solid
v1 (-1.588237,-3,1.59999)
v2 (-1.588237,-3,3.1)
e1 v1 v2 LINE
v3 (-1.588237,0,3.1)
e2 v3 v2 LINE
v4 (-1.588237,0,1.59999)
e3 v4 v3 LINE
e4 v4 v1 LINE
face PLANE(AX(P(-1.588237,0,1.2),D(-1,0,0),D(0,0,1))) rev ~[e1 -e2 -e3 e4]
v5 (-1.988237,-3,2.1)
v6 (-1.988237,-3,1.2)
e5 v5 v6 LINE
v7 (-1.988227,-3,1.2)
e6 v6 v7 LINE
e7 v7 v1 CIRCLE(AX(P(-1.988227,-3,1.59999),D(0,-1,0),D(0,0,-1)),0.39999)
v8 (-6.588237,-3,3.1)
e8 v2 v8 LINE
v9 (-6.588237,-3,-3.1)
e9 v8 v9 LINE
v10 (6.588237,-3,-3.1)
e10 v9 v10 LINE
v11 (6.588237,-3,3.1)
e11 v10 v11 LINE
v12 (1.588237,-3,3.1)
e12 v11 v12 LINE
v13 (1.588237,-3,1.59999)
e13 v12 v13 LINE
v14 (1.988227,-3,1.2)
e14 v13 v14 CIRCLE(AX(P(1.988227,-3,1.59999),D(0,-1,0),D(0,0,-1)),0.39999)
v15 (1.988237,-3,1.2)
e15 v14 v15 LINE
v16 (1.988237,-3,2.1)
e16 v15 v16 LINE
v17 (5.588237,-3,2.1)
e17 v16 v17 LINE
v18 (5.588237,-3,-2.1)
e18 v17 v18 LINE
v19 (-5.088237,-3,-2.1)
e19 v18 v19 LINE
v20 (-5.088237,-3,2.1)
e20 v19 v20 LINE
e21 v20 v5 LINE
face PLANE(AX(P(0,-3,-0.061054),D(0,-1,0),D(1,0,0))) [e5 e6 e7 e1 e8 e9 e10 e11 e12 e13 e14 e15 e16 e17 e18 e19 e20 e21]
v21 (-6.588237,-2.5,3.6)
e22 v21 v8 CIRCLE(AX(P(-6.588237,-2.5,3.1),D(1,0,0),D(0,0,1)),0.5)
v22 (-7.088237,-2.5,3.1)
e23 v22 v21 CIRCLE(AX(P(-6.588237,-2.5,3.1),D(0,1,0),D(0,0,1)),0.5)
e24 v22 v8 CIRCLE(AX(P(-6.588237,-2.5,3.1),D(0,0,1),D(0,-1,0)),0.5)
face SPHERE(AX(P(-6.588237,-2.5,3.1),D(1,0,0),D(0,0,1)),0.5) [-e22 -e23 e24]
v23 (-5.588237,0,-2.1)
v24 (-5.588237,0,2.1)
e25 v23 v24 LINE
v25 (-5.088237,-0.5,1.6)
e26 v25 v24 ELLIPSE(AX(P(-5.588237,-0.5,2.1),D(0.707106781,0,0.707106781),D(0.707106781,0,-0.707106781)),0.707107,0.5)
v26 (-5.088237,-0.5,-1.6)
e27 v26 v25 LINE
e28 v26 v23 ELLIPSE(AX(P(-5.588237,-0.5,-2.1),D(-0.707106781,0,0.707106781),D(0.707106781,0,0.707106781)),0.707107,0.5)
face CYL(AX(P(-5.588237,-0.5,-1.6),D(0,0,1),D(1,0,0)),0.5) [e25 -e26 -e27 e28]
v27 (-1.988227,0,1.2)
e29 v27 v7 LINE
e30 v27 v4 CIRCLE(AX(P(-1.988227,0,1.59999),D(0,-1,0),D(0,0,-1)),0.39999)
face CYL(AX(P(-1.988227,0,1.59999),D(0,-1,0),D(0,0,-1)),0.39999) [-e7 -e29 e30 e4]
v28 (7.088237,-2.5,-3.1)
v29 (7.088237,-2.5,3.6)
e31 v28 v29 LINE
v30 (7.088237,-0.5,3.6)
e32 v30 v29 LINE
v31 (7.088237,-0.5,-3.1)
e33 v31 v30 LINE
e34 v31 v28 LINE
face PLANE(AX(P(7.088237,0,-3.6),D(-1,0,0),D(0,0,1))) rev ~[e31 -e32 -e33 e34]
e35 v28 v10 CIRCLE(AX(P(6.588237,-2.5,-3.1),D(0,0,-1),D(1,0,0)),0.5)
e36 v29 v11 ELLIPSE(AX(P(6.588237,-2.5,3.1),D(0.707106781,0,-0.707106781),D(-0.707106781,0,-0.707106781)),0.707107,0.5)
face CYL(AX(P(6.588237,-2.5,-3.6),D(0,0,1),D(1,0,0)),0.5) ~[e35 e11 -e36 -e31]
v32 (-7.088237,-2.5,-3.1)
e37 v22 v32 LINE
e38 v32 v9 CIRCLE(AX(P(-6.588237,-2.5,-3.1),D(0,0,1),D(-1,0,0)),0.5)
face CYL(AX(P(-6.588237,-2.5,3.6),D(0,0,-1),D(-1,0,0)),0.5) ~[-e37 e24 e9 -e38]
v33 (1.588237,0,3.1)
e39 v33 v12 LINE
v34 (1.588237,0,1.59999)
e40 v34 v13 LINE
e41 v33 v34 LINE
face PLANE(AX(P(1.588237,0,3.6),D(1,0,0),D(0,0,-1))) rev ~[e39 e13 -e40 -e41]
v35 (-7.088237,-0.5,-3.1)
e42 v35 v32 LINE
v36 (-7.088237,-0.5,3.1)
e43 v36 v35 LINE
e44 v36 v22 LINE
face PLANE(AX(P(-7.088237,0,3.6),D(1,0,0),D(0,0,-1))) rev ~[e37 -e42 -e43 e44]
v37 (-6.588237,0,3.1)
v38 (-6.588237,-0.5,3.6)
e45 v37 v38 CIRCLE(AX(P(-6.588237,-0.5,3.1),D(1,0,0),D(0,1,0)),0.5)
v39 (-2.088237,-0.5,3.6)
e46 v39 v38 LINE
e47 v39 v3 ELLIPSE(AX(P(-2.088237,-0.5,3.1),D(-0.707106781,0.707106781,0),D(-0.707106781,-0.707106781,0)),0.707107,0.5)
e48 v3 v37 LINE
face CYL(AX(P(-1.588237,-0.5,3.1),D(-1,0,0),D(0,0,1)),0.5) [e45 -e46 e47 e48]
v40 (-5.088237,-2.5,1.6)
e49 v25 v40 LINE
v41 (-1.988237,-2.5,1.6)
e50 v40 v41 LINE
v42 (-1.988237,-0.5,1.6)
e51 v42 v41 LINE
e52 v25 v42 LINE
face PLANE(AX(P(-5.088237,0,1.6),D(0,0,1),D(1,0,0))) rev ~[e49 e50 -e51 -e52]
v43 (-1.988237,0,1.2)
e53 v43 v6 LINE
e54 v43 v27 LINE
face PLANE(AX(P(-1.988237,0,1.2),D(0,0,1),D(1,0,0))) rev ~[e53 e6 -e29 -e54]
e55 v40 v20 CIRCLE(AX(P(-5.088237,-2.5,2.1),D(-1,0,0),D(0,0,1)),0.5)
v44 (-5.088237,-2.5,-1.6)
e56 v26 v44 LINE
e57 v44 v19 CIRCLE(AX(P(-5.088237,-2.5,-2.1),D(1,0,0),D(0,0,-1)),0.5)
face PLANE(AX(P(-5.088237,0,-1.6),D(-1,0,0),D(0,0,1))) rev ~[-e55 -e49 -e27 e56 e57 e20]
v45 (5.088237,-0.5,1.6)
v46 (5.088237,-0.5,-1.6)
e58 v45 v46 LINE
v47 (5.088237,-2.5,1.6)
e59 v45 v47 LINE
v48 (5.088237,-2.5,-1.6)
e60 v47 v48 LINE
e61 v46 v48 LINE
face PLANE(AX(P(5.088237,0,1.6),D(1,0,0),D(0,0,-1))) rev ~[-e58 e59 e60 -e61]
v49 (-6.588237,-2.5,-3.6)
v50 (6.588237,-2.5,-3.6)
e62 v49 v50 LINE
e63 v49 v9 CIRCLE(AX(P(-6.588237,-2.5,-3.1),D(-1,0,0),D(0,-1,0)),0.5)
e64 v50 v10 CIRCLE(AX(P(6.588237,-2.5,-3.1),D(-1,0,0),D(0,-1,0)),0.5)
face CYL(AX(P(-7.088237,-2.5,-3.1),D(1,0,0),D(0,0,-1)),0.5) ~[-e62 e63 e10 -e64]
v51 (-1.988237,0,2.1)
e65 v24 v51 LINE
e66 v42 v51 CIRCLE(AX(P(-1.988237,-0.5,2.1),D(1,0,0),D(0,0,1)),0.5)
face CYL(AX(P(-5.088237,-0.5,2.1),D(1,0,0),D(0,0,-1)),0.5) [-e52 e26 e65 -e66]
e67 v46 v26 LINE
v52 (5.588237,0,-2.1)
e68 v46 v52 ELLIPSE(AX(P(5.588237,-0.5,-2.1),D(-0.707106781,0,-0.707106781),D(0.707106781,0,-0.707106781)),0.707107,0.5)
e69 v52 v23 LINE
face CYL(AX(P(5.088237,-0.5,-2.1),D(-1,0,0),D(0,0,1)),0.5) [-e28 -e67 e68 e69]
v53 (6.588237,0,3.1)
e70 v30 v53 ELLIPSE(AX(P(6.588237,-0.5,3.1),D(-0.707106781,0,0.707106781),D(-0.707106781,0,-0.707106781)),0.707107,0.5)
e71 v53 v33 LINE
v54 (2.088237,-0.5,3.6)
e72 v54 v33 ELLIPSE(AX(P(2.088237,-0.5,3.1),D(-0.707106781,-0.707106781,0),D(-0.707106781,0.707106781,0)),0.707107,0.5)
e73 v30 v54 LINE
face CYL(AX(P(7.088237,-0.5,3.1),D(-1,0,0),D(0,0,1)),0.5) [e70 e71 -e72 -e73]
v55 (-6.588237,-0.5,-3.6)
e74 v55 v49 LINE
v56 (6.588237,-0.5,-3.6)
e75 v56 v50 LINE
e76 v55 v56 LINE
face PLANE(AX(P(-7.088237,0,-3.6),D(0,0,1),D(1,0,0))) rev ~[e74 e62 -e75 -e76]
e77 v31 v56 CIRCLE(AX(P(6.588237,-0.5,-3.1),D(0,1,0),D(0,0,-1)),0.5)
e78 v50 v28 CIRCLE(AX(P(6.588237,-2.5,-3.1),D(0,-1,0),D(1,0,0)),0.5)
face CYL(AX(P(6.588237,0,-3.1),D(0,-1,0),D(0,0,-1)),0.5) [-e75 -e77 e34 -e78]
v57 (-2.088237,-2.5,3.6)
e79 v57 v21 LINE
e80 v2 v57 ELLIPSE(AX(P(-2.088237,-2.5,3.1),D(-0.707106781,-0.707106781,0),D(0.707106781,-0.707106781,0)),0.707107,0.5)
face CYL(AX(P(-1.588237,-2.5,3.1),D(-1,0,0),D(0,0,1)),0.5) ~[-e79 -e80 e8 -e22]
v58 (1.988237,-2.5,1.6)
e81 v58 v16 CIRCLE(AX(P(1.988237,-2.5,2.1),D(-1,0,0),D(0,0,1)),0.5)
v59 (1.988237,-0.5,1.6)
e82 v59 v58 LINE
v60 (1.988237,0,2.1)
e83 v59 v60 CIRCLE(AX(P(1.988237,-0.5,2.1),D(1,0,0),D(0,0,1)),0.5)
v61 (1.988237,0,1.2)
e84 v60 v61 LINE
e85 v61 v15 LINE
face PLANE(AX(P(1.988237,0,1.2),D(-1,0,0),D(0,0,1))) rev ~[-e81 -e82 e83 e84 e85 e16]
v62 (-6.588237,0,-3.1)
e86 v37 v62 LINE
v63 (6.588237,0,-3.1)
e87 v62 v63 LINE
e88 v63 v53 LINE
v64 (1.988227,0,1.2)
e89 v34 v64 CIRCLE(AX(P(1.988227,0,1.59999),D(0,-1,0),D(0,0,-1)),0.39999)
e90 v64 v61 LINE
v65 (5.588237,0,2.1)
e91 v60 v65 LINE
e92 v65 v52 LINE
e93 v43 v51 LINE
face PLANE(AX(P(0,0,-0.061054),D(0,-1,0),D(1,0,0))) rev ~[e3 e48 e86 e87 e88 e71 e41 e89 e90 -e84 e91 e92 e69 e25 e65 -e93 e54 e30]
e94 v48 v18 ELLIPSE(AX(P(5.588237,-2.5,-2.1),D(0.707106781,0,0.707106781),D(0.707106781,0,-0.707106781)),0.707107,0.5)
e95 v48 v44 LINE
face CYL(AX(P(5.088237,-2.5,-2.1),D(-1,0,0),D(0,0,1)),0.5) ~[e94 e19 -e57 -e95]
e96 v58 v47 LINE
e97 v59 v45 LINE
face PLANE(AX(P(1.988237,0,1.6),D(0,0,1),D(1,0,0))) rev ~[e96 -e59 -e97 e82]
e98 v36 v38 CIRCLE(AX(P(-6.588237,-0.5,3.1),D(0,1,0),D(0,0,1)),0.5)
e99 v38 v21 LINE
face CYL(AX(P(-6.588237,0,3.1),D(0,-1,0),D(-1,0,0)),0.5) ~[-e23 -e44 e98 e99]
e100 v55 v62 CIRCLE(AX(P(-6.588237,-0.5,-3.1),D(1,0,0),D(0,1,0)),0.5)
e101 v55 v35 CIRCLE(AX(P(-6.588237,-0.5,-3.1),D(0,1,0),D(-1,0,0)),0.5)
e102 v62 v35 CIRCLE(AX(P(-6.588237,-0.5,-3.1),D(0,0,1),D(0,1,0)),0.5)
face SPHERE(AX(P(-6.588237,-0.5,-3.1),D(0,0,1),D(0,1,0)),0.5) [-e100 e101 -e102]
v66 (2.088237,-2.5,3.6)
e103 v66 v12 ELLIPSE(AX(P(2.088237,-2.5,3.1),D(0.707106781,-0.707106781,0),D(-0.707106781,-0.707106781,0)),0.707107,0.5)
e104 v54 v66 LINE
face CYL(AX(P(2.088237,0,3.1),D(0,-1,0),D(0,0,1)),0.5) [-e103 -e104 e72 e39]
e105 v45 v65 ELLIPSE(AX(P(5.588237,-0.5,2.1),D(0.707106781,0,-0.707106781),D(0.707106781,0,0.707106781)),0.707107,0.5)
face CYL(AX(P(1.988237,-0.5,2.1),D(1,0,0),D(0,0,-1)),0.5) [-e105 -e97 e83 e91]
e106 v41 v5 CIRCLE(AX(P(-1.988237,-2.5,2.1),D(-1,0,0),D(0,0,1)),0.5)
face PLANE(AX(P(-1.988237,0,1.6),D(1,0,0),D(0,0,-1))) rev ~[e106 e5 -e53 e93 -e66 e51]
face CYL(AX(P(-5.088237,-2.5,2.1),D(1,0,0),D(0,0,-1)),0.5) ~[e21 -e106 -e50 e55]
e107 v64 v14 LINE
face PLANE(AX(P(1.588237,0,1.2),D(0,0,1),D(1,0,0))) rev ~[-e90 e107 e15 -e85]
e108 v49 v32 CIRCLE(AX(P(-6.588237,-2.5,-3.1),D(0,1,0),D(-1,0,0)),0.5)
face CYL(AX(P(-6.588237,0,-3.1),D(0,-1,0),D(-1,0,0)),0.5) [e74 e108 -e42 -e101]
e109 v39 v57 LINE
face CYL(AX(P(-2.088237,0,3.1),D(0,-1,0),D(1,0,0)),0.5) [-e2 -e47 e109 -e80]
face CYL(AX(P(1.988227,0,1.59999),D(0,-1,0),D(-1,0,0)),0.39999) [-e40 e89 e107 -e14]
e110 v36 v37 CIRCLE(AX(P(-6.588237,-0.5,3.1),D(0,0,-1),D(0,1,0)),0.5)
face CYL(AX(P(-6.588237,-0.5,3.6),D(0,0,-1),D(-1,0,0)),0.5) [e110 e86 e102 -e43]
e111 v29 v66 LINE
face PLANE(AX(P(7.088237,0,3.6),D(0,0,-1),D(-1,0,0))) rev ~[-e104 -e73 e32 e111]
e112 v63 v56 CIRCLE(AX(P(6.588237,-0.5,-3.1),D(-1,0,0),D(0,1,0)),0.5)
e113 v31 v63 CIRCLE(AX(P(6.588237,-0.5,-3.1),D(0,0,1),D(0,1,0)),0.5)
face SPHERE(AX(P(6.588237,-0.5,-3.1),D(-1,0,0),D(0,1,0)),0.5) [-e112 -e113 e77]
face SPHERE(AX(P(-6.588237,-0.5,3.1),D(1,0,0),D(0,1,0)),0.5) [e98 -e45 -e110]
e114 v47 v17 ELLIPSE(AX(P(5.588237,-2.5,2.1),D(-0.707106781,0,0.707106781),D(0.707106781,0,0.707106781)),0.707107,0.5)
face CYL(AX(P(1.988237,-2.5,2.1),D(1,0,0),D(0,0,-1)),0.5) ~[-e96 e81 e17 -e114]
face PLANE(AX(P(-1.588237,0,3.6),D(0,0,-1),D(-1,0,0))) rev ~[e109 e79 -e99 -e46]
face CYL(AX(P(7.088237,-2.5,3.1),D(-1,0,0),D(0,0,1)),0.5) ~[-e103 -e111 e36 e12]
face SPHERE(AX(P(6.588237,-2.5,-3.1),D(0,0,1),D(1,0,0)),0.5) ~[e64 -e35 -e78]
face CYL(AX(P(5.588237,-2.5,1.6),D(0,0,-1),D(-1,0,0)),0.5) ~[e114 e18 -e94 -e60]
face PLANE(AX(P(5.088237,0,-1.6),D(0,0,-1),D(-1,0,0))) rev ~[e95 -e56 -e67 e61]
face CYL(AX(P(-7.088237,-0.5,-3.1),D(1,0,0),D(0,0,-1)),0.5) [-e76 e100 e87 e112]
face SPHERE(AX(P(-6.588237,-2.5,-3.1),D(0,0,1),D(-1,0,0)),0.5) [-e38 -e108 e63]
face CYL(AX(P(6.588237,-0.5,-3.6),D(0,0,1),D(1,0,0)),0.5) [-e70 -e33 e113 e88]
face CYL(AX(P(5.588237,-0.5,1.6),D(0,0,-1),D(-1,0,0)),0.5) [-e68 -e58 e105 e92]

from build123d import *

# Parameters (mm, degrees)
F1_DEPTH = 3
F2_R     = 0.5
F3_R     = 0.39999


# Not quite as in the source:
# - a fillet or chamfer is up to 0.001 mm smaller than in the source, because OpenCascade refuses the exact size


with BuildPart() as f1:
    # F0 (on Front) → F1 (new body)
    with BuildSketch(Plane.XZ):
        Polygon((-7.0882368928, 3.6), (-7.0882368928, -3.6), (7.0882368928, -3.6), (7.0882368928, 3.6), (1.5882368928, 3.6), (1.5882368928, 1.6), (1.5882368928, 1.2), (1.9882368928, 1.2), (1.9882368928, 1.6), (5.0882368928, 1.6), (5.0882368928, -1.6), (-5.0882368928, -1.6), (-5.0882368928, 1.6), (-1.9882368928, 1.6), (-1.9882368928, 1.2), (-1.5882368928, 1.2), (-1.5882368928, 1.6), (-1.5882368928, 3.6), align=None)
    extrude(amount=F1_DEPTH)

    # F2
    f2_edges = [f1.edges().sort_by_distance(p)[0] for p in [
        (4.338237, 0, 3.6),
        (-4.338237, 0, 3.6),
        (-7.088237, 0, 0),
        (0, 0, -3.6),
        (7.088237, 0, 0),
        (1.588237, -1.5, 3.6),
        (-1.588237, -1.5, 3.6),
        (-4.338237, -3, 3.6),
        (-7.088237, -1.5, 3.6),
        (4.338237, -3, 3.6),
        (3.538237, -3, 1.6),
        (-3.538237, -3, 1.6),
        (3.538237, 0, 1.6),
        (-3.538237, 0, 1.6),
        (-7.088237, -3, 0),
        (7.088237, -3, 0),
        (5.088237, -3, 0),
        (-5.088237, 0, 0),
        (-7.088237, -1.5, -3.6),
        (7.088237, -1.5, -3.6),
        (5.088237, 0, 0),
        (0, 0, -1.6),
        (0, -3, -1.6),
        (0, -3, -3.6),
    ]]
    fillet(f2_edges, radius=F2_R)

    # F3 (radius 0.4 in the source; OpenCascade refuses exactly that, so slightly less here)
    f3_edges = [f1.edges().sort_by_distance(p)[0] for p in [
        (1.588237, -1.5, 1.2),
        (-1.588237, -1.5, 1.2),
    ]]
    fillet(f3_edges, radius=F3_R)


solid = f1.part
